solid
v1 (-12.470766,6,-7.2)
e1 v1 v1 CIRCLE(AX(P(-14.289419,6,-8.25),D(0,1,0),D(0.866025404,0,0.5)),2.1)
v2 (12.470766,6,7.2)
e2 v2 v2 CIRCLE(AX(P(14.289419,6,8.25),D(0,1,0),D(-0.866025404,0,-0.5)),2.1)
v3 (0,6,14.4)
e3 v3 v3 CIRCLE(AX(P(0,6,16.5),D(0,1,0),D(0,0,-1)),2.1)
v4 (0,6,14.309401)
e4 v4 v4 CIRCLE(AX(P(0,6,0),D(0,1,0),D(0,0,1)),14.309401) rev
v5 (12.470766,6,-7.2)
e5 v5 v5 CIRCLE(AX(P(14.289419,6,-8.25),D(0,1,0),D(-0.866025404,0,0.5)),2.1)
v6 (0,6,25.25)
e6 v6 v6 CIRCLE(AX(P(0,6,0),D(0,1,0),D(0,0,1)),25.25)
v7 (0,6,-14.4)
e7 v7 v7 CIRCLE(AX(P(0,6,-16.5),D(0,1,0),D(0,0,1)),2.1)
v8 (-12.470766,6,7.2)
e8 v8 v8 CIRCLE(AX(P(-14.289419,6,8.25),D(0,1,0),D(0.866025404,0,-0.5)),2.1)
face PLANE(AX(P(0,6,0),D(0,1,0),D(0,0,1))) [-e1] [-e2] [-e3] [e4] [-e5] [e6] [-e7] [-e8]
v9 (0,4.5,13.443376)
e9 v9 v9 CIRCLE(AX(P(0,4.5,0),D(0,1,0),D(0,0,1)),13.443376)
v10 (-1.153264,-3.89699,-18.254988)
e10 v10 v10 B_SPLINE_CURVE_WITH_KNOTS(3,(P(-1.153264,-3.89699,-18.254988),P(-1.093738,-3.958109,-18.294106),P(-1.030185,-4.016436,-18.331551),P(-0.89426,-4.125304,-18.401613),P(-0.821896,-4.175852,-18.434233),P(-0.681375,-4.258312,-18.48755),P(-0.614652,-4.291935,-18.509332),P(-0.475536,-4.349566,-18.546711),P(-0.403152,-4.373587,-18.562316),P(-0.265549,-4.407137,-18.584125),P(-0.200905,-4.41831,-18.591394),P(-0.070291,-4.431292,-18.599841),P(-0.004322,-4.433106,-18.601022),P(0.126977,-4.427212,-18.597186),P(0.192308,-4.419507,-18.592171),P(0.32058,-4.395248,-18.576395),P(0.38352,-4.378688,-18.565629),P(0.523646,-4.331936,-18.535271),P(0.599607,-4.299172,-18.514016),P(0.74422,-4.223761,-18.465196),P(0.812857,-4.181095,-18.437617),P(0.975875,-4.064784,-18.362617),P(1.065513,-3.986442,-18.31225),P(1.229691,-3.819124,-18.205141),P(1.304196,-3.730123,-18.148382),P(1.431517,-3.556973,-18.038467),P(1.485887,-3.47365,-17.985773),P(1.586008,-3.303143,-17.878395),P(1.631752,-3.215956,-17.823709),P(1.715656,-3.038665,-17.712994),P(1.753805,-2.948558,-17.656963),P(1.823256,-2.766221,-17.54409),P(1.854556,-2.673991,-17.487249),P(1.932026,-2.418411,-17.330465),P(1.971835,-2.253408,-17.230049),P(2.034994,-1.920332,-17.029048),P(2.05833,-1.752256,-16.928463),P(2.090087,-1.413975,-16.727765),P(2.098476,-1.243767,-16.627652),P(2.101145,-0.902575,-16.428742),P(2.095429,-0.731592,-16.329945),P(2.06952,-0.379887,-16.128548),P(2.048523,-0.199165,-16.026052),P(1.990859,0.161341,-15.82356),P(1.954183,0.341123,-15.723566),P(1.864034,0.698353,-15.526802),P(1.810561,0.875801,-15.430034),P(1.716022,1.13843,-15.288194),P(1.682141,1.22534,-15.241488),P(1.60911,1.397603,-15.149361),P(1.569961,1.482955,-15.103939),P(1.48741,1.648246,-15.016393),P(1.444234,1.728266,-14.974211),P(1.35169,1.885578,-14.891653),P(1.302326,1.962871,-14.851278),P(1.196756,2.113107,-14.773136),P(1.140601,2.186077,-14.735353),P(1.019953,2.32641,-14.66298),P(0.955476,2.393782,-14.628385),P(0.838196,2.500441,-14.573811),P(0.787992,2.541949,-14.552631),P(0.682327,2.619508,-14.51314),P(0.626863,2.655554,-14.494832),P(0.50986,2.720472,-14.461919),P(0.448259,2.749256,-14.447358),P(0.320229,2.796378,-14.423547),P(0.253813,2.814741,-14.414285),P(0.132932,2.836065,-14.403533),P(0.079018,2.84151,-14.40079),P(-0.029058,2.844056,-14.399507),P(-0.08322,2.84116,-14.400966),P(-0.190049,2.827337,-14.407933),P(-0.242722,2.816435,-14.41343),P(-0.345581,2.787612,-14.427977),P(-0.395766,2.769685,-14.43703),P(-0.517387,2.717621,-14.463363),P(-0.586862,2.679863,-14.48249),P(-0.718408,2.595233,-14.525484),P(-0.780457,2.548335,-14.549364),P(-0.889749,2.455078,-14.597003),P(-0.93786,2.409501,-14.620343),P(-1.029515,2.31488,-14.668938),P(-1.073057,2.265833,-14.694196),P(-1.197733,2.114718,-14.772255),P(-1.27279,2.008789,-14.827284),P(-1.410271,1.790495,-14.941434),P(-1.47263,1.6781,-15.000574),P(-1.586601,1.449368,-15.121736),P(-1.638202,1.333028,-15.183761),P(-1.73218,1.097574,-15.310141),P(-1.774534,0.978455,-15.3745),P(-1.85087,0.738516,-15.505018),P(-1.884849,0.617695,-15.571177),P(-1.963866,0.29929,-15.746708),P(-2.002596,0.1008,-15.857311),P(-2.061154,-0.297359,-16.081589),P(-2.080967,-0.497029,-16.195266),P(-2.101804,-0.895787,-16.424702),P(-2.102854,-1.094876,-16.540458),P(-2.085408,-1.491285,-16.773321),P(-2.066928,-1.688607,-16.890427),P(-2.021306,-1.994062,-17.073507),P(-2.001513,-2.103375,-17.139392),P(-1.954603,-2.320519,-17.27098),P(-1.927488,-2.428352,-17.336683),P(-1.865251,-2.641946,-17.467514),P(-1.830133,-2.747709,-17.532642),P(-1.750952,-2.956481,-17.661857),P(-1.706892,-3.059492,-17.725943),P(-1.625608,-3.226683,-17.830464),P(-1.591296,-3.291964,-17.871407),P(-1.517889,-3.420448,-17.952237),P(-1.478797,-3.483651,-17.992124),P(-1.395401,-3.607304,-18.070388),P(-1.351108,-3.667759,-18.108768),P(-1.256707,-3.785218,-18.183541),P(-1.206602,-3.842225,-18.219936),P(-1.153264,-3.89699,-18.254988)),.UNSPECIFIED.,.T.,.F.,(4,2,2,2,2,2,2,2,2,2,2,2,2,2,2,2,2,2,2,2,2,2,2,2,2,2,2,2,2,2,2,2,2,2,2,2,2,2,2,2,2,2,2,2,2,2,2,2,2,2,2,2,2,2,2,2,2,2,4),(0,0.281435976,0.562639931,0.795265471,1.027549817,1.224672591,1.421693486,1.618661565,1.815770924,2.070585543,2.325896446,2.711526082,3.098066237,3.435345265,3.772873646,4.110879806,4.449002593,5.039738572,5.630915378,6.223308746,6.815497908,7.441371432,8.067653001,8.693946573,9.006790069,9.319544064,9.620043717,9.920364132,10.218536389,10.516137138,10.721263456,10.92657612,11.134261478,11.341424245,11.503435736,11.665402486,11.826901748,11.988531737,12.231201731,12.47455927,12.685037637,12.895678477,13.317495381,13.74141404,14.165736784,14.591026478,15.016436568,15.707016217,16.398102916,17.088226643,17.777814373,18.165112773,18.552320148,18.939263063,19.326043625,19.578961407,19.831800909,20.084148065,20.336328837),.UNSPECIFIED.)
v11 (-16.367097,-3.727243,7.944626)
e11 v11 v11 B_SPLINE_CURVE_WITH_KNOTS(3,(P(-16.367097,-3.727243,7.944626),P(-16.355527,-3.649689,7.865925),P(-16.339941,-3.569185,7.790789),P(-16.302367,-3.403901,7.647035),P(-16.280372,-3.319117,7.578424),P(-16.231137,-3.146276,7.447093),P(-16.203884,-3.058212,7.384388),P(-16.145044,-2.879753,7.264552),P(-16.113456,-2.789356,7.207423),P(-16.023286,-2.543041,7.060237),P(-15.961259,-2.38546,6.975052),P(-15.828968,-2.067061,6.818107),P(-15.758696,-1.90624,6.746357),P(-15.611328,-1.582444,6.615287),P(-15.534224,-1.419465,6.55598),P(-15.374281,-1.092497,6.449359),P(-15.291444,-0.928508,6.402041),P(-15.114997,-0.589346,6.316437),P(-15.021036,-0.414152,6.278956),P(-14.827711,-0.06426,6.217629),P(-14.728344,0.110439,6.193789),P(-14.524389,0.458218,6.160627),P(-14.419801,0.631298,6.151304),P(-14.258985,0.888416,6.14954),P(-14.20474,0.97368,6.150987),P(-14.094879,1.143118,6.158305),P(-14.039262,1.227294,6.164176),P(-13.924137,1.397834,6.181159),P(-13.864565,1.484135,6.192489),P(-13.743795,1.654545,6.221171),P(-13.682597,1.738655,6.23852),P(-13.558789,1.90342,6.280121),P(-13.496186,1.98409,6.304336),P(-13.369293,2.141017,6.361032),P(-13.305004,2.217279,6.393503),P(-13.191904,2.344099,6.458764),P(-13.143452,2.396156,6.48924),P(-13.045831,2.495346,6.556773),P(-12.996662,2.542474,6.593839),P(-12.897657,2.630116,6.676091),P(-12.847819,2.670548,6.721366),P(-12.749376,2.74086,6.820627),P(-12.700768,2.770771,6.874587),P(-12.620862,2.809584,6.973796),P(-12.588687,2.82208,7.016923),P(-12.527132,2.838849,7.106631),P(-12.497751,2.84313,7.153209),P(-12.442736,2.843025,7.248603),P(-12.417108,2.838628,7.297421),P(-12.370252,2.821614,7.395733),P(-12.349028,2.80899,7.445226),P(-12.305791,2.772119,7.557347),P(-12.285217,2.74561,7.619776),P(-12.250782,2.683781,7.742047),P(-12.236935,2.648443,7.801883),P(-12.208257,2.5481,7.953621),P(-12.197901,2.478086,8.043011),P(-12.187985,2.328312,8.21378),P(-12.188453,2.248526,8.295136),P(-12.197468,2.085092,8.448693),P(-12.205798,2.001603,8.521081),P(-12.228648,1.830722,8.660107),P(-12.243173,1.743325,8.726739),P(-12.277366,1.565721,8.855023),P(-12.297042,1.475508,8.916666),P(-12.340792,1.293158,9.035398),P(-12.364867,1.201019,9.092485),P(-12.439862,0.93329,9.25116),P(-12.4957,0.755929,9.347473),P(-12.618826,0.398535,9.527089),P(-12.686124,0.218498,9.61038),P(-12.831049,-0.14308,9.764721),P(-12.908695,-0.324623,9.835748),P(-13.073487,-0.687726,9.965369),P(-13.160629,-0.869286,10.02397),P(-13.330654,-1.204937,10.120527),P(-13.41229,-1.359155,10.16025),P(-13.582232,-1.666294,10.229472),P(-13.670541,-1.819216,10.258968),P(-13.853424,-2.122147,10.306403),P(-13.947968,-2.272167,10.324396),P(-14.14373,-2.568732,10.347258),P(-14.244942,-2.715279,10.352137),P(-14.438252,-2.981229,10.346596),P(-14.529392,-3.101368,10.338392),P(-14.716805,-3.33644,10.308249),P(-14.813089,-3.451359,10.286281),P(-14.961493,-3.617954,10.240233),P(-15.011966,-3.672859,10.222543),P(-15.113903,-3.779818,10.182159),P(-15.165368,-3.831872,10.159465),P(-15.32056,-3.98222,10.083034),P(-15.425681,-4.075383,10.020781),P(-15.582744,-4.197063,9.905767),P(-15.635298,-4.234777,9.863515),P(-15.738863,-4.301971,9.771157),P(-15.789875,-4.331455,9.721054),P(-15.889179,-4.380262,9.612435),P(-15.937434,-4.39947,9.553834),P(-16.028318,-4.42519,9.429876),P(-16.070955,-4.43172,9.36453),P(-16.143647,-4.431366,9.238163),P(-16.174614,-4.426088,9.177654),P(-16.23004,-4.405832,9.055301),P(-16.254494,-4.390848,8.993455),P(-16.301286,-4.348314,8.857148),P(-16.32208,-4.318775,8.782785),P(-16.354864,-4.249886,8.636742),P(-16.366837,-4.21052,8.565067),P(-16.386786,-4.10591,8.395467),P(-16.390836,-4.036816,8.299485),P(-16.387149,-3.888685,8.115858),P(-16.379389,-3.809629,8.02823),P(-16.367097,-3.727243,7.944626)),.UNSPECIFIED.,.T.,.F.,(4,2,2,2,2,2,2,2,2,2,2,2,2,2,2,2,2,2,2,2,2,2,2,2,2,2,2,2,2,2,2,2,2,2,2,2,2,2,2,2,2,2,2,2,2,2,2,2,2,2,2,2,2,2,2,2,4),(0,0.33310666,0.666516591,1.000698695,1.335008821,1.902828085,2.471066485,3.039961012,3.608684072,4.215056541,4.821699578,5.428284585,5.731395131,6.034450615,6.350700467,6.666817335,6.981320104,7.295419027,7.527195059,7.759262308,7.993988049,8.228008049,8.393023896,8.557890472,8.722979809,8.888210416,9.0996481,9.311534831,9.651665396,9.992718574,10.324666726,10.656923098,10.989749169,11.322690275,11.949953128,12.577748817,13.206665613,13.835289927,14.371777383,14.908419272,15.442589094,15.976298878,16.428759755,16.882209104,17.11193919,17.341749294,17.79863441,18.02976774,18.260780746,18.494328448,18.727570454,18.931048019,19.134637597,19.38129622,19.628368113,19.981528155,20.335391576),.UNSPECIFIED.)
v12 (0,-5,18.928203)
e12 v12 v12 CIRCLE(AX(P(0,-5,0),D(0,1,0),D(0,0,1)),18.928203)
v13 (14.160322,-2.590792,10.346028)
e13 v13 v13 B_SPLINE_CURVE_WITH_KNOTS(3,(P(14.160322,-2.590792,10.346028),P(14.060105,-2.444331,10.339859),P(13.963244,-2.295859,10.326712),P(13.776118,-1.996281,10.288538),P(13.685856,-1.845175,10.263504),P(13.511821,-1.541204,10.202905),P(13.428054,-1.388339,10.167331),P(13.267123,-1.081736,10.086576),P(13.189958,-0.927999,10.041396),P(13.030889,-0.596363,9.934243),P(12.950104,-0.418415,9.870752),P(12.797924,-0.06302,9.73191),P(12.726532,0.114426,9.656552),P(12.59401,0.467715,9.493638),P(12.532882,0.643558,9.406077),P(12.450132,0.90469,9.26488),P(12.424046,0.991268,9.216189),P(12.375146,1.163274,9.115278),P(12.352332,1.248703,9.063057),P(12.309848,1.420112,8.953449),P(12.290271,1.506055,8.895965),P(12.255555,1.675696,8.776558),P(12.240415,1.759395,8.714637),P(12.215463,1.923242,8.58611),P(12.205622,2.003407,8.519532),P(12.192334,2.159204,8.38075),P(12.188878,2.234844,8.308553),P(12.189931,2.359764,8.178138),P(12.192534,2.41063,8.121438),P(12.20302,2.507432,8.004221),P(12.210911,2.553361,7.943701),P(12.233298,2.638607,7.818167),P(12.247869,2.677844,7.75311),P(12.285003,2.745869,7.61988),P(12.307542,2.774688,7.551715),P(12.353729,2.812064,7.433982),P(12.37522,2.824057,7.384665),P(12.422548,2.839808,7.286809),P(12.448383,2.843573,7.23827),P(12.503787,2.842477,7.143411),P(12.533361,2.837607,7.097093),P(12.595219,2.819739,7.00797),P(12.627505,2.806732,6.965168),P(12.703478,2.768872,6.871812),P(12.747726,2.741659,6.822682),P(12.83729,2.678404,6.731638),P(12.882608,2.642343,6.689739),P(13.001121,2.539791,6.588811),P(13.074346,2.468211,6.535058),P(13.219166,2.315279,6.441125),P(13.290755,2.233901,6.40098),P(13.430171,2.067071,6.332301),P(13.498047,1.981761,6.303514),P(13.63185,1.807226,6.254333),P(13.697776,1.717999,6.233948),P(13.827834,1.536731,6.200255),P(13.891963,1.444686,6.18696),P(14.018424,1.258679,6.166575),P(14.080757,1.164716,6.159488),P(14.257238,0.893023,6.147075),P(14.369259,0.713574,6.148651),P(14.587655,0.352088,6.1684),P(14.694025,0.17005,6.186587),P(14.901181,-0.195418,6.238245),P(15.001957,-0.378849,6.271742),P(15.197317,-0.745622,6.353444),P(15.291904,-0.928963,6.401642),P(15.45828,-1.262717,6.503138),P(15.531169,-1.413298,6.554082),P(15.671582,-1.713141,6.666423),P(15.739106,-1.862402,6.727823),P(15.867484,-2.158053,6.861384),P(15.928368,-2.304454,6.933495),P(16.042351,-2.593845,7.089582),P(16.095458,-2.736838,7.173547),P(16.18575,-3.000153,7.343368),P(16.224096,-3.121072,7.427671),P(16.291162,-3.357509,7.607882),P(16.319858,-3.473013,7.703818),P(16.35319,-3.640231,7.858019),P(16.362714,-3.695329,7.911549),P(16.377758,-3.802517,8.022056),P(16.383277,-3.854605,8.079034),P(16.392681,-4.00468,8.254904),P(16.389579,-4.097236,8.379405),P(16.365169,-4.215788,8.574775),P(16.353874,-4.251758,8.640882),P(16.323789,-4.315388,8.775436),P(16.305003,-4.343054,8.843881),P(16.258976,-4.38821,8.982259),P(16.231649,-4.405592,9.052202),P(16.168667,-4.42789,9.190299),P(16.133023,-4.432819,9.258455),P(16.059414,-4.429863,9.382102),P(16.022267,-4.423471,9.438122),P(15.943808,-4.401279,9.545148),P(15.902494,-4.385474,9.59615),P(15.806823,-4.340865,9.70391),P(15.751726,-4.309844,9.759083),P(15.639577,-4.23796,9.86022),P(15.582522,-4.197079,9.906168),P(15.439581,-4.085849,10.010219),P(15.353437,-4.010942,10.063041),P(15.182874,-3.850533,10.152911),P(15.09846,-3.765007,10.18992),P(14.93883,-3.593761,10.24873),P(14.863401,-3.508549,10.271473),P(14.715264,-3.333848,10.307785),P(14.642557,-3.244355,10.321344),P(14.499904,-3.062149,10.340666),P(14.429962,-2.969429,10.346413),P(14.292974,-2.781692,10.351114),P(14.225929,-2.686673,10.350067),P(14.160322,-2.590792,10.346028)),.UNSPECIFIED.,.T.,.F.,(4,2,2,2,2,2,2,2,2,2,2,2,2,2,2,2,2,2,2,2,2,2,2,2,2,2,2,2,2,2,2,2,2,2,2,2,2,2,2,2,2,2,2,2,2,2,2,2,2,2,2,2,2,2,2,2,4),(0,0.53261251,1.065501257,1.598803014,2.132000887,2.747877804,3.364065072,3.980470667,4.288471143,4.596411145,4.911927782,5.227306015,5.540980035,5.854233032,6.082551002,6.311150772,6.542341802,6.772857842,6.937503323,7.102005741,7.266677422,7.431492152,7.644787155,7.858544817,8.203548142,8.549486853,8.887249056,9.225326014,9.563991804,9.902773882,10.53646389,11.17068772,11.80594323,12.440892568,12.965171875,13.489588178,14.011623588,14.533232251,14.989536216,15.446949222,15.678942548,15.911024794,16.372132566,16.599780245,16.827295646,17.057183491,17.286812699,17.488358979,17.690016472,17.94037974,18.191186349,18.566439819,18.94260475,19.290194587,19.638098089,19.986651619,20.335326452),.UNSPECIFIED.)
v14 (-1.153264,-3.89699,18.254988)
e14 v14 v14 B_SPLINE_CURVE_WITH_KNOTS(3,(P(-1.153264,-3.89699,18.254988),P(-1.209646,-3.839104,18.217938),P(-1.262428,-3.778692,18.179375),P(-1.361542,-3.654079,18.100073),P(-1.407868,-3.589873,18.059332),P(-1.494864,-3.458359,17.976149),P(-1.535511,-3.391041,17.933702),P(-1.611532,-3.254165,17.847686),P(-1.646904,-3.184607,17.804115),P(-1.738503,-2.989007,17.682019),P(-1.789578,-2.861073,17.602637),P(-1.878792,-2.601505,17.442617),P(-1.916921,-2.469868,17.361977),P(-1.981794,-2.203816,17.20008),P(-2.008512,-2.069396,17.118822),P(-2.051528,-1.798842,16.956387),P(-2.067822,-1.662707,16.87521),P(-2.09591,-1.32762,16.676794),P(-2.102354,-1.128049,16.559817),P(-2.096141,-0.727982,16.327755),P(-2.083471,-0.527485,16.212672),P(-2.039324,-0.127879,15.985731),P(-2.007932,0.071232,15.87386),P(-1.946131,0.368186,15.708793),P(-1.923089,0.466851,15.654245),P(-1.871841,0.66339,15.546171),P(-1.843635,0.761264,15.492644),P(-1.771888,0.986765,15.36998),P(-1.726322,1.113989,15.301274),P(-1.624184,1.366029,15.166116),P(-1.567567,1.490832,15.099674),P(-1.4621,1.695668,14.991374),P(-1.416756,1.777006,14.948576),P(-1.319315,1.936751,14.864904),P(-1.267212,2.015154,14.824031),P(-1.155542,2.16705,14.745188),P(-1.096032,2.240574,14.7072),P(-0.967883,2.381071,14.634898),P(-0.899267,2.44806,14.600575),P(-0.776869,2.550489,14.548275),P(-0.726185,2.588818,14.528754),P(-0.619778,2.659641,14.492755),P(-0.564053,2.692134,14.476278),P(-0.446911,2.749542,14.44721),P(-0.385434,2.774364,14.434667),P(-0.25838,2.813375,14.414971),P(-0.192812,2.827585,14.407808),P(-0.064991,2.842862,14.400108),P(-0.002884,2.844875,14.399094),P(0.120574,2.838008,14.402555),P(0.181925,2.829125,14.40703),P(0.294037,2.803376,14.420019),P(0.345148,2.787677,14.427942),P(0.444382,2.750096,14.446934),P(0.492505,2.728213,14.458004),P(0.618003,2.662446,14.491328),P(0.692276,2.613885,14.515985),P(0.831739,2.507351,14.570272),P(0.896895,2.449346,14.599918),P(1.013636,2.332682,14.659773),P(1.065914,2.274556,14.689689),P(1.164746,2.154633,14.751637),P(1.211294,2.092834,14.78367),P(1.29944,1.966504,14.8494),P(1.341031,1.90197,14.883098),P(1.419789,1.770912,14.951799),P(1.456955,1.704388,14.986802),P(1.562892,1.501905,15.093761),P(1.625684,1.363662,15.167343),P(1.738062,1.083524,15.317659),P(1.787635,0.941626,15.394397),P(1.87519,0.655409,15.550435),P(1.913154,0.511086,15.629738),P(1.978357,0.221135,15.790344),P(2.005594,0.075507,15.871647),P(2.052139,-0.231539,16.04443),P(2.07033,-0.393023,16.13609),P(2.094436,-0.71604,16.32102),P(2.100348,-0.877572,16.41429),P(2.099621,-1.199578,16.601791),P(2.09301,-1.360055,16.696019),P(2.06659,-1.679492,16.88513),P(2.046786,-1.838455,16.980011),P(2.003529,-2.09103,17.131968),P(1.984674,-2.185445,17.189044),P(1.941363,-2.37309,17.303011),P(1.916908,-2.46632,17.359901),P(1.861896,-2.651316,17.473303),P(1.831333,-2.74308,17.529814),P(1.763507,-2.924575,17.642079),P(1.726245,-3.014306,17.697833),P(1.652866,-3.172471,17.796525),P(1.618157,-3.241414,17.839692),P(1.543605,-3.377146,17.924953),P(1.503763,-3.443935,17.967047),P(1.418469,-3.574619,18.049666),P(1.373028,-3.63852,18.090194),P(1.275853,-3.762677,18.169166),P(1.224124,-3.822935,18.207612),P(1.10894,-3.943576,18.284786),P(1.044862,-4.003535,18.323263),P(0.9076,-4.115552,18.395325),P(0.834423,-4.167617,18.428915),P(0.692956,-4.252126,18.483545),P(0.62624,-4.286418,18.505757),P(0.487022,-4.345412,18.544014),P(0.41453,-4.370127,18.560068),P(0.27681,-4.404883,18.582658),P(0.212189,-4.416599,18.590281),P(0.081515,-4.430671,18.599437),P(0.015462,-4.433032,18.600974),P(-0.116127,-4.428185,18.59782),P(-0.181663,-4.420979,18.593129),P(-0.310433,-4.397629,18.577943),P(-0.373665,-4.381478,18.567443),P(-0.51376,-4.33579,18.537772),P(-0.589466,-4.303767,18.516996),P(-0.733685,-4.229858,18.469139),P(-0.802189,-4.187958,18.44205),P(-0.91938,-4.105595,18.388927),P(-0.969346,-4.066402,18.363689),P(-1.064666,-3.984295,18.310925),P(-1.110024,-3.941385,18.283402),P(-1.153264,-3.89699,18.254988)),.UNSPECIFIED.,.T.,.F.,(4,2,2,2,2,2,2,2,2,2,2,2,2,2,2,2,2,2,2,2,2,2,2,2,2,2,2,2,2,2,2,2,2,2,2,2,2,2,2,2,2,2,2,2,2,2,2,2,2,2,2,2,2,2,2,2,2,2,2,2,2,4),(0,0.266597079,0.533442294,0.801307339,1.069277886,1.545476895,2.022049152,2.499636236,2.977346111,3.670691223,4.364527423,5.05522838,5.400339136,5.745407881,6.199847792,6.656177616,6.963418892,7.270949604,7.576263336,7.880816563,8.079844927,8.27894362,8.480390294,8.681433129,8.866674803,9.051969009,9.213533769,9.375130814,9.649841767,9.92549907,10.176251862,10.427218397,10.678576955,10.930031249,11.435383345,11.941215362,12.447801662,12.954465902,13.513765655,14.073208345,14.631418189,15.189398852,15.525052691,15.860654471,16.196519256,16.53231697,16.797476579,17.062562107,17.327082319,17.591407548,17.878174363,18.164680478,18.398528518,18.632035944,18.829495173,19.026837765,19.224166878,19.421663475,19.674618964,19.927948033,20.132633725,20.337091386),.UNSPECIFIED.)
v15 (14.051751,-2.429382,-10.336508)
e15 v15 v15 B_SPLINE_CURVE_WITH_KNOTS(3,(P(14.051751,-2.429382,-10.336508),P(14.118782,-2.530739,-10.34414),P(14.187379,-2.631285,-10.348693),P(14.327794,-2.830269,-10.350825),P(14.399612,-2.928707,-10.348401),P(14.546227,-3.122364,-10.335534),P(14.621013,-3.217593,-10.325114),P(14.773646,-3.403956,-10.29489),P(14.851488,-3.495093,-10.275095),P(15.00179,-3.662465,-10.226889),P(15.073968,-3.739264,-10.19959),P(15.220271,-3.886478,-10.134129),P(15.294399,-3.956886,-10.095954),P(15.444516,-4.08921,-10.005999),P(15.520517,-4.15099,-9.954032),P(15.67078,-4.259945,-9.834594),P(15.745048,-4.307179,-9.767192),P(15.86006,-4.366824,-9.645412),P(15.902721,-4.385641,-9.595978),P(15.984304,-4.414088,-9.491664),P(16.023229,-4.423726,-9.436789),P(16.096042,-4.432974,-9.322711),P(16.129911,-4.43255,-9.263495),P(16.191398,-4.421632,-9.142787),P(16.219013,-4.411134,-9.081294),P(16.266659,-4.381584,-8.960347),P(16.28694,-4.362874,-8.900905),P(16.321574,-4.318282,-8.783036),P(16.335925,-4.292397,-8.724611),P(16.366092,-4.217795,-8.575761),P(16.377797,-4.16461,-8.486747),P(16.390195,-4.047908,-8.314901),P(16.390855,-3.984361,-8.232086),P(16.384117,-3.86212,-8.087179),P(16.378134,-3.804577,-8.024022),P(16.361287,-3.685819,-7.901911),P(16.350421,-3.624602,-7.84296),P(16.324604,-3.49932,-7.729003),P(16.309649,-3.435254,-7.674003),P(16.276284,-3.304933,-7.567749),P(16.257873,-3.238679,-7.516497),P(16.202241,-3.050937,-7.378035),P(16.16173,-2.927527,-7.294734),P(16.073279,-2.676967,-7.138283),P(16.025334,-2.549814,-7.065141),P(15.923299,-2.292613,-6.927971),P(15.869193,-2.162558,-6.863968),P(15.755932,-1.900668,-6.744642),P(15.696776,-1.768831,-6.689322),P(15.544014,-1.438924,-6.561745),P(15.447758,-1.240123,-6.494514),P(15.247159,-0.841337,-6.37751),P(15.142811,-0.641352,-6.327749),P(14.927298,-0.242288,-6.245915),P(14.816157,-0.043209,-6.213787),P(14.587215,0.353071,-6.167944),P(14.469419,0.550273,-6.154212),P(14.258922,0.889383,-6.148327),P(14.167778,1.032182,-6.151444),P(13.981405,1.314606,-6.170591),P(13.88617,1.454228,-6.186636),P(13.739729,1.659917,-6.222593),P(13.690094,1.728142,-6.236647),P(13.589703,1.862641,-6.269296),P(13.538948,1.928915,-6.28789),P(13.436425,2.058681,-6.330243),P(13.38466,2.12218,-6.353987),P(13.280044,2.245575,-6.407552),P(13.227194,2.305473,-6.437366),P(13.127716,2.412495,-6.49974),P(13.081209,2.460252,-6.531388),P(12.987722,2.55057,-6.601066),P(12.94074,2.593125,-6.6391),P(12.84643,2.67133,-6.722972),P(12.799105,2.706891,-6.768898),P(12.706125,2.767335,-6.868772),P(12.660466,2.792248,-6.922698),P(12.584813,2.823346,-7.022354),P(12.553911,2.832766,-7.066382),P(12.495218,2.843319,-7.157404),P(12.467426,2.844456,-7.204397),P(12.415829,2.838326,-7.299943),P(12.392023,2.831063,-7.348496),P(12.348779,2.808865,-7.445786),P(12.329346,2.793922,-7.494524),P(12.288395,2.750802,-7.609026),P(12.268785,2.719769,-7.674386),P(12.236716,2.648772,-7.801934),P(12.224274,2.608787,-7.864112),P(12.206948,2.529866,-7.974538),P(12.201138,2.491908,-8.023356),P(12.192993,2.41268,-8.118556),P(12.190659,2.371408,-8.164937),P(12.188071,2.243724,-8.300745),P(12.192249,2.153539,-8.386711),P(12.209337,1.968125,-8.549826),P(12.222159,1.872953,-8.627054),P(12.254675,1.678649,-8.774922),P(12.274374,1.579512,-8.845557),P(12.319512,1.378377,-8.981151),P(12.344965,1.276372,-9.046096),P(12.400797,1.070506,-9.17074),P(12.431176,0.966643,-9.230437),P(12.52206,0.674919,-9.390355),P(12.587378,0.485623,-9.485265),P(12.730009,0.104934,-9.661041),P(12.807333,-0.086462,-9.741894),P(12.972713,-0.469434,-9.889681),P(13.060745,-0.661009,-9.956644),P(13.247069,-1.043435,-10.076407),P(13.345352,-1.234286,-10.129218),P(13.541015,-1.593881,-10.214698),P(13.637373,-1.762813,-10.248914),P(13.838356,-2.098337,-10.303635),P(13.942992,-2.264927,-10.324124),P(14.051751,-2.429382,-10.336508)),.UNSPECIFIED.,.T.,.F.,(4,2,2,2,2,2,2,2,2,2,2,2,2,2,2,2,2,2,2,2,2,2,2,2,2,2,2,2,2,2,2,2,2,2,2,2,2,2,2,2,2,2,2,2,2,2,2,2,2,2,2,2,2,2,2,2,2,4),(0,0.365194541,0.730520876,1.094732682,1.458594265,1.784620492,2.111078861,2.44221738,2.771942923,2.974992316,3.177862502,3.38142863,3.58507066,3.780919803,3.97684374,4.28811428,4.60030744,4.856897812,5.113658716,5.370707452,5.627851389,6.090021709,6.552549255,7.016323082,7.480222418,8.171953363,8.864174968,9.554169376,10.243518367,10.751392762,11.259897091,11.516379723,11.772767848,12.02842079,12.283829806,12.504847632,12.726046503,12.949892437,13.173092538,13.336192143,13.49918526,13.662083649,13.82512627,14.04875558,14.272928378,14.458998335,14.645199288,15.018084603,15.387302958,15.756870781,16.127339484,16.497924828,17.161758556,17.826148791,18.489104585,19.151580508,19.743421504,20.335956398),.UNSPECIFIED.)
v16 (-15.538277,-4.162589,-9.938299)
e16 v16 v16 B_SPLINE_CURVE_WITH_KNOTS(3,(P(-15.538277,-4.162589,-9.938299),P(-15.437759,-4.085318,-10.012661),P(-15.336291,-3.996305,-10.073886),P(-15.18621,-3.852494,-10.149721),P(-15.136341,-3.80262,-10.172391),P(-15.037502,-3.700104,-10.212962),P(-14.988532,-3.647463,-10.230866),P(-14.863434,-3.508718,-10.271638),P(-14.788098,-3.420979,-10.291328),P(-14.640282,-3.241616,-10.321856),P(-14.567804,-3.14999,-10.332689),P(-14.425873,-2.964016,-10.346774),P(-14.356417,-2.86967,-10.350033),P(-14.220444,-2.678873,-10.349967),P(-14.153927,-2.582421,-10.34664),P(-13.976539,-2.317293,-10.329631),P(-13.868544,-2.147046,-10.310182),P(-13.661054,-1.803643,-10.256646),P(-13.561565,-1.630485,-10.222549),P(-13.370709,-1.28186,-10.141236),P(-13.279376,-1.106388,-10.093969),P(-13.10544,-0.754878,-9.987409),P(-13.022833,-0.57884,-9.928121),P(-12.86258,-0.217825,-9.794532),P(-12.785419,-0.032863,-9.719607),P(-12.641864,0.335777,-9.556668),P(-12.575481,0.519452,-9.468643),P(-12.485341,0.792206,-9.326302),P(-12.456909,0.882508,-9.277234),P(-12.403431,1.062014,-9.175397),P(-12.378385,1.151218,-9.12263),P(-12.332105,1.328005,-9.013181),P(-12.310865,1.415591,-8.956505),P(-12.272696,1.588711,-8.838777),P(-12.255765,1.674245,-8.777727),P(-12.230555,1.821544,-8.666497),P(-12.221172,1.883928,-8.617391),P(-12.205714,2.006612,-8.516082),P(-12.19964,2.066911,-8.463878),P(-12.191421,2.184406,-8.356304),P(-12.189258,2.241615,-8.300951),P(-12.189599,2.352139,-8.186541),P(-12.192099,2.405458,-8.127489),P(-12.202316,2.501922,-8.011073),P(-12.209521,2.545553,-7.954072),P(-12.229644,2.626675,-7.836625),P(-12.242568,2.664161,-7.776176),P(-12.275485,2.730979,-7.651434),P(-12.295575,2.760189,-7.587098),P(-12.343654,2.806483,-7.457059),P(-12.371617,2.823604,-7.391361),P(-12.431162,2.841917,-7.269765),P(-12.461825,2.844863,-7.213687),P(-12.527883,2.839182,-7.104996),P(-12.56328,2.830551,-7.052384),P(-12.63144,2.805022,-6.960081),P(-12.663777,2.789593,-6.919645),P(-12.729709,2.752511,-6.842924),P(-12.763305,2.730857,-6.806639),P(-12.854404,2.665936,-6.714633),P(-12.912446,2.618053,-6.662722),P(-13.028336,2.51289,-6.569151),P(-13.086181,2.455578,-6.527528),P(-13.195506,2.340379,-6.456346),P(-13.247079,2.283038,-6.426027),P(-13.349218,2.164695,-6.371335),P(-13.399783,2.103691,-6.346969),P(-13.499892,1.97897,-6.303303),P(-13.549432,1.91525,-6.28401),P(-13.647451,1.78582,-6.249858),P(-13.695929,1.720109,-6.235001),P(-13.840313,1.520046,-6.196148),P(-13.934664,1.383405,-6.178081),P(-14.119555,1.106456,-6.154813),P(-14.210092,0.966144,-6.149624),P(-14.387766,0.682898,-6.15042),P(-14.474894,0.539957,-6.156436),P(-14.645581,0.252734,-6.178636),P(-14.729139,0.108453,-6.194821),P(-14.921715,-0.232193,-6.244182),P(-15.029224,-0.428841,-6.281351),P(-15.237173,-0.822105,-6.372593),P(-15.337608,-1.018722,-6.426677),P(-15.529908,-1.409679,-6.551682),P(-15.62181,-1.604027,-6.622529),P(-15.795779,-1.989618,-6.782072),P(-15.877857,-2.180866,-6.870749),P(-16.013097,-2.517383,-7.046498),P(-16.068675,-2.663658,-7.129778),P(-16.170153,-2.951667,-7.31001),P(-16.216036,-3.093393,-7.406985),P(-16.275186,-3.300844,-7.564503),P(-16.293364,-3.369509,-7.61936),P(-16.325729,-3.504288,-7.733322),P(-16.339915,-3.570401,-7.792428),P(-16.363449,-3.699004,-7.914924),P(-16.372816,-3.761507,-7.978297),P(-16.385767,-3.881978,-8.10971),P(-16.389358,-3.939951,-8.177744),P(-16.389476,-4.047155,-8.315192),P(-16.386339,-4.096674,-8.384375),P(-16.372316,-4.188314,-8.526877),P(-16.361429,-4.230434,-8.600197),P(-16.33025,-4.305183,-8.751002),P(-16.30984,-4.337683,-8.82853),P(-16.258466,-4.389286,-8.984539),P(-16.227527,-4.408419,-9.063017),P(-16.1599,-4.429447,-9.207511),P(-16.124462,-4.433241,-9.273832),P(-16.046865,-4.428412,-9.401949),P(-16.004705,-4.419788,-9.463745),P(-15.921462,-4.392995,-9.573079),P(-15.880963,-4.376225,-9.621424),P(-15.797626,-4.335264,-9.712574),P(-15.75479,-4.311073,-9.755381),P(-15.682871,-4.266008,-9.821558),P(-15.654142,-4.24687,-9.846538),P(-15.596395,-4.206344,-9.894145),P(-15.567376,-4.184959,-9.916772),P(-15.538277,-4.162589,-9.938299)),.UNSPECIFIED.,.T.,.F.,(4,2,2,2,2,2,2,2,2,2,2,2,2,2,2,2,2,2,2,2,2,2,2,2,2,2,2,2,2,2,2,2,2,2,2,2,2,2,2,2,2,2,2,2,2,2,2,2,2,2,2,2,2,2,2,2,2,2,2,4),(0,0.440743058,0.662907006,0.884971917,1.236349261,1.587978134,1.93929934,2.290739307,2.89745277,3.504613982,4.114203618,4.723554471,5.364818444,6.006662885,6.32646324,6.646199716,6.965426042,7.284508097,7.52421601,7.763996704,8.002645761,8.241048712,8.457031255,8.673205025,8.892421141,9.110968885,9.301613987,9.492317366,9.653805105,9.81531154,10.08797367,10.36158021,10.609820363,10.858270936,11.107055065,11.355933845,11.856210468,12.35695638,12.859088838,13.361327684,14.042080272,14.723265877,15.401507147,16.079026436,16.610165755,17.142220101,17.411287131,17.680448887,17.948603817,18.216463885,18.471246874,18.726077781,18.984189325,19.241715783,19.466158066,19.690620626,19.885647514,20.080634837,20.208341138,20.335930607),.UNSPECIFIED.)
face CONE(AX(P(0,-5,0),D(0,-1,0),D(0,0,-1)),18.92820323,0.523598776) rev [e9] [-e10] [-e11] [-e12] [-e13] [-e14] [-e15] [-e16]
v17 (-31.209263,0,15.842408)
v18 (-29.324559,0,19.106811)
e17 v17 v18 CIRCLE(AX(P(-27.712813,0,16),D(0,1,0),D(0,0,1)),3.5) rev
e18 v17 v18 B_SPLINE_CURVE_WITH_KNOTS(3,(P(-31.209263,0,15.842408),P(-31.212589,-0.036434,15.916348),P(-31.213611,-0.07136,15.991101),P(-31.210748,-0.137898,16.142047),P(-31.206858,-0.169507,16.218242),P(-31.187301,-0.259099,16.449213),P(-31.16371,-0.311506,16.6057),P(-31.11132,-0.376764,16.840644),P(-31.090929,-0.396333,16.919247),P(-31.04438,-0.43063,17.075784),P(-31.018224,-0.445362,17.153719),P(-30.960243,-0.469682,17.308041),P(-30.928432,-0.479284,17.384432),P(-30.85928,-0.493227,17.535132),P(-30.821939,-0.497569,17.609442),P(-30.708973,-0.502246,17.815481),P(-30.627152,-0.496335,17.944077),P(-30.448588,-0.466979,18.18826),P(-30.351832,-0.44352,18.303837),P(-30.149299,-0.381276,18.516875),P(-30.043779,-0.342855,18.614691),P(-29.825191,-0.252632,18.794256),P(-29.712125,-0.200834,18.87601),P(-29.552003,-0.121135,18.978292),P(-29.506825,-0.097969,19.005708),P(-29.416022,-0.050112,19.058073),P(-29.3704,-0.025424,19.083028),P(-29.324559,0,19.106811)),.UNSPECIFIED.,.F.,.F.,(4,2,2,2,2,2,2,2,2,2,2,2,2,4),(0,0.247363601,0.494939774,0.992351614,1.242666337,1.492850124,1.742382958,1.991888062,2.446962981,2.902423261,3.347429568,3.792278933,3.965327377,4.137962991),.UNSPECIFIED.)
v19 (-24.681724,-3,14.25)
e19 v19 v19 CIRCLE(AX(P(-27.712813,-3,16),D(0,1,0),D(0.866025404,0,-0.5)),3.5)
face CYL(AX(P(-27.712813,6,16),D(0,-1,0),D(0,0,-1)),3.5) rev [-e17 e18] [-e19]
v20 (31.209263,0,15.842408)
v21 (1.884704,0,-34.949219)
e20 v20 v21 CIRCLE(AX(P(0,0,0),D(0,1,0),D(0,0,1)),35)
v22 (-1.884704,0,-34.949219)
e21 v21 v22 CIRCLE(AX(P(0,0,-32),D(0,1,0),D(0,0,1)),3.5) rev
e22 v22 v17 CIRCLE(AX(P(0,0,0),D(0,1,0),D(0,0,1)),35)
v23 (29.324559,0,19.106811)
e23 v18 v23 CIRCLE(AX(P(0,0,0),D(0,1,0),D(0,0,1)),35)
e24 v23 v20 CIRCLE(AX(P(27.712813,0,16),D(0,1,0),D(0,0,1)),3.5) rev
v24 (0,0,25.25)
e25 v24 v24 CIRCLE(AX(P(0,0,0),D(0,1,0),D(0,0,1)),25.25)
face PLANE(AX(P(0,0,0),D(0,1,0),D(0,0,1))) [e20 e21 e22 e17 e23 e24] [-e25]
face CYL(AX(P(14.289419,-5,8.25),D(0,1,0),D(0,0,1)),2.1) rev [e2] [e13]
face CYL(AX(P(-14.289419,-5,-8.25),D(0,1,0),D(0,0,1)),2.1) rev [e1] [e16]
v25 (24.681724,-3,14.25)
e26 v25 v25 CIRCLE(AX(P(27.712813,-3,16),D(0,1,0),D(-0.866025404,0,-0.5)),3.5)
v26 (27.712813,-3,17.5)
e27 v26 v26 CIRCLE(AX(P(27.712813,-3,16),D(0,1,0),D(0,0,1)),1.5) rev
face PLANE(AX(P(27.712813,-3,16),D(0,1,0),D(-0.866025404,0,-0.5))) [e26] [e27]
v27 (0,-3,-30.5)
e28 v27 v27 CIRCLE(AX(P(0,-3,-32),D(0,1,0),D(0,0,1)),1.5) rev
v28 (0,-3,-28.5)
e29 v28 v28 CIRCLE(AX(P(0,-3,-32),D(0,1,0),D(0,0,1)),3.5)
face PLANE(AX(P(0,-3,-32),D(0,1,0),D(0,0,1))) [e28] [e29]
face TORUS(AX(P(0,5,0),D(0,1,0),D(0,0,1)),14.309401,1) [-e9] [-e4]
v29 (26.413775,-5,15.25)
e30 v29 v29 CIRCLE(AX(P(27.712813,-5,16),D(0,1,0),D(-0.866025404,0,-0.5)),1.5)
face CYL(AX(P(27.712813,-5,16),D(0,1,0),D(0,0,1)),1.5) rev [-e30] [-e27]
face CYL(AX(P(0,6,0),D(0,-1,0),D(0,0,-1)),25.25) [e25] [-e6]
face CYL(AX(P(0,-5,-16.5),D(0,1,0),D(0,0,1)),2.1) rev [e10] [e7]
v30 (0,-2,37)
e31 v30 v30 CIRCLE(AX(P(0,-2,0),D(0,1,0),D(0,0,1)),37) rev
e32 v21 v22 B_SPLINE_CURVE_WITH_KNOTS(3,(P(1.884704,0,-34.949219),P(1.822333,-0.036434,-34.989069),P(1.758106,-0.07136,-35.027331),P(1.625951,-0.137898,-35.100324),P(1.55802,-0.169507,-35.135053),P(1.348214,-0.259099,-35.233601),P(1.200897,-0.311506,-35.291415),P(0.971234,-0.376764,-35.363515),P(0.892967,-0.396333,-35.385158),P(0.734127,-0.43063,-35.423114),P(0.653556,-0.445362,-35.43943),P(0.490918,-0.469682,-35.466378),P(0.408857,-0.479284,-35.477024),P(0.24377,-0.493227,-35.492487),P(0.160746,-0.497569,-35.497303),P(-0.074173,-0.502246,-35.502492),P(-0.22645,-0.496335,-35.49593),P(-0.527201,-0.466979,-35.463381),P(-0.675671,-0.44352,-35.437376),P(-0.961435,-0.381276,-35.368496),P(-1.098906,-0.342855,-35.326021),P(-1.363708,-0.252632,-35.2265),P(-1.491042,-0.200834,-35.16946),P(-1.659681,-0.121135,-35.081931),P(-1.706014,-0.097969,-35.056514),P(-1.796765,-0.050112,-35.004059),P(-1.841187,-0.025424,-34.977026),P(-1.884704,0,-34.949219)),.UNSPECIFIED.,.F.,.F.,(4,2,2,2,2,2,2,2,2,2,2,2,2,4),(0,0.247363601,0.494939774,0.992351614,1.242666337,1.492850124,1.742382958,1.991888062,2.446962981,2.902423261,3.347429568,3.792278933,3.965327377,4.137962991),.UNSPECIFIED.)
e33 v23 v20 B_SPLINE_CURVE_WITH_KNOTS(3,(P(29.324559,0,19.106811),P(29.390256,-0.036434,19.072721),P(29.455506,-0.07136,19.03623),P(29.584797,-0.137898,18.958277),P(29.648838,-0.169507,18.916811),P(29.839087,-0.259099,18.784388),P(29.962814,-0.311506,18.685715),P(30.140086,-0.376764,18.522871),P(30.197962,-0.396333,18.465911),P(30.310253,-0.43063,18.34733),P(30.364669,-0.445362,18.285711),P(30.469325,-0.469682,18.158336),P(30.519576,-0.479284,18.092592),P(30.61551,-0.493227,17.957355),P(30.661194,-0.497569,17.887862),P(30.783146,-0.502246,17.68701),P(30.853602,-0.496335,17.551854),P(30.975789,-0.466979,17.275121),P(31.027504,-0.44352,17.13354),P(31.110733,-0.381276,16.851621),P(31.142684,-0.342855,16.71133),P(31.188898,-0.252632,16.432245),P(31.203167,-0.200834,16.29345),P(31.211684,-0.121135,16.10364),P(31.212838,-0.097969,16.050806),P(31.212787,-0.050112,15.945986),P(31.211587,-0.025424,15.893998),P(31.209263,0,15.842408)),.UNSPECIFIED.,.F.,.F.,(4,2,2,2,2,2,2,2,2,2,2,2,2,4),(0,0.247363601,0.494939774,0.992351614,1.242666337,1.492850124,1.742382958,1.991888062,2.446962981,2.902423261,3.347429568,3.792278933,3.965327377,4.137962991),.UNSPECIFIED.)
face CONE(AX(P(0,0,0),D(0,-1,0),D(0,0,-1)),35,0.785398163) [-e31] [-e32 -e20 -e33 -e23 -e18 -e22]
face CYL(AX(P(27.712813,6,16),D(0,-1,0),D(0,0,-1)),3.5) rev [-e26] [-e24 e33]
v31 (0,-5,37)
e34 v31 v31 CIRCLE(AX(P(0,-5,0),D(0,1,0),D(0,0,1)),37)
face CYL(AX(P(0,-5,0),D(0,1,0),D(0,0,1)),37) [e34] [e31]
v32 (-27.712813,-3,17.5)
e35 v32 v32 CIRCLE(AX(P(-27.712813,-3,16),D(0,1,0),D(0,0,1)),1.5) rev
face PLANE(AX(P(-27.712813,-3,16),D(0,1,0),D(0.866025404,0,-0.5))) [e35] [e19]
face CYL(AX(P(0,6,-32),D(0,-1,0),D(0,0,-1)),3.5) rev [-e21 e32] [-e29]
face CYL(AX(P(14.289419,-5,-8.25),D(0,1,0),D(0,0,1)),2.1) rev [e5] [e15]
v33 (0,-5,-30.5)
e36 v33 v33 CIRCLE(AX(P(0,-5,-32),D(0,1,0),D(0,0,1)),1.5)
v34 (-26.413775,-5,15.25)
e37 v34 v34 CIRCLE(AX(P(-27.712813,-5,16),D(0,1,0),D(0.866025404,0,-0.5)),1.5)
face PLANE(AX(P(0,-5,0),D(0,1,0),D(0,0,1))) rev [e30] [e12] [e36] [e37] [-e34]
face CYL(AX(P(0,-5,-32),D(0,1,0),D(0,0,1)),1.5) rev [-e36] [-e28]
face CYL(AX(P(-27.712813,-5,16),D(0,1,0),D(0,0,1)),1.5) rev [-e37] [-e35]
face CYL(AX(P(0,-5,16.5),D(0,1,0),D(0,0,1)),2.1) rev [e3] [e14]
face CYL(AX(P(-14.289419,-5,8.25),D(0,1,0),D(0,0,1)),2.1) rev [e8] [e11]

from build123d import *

# Parameters (mm, degrees)
SKETCH1_R           = 25.25
SKETCH1_R_2         = 12
BOSS_EXTRUDE1_DEPTH = 6
BOSS_EXTRUDE2_START = -5
SKETCH2_R           = 37
SKETCH2_R_2         = 12
BOSS_EXTRUDE2_DEPTH = 5
SKETCH3_R           = 1.5
CUT_EXTRUDE1_DEPTH  = 53.668776329
CUT_EXTRUDE2_START  = -3
SKETCH4_R           = 3.5
CUT_EXTRUDE2_DEPTH  = 56.668776329
CIRPATTERN1_COUNT   = 3
CHAMFER1_SIZE       = 12
CHAMFER1_SIZE_2     = 6.92820323
CHAMFER2_SIZE       = 2
SKETCH5_R           = 2.1
CUT_EXTRUDE3_DEPTH  = 54.46961768
CIRPATTERN2_COUNT   = 6
FILLET1_R           = 1


with BuildPart() as part:
    # Sketch1 → Boss-Extrude1 (new body)
    with BuildSketch(Plane(origin=(0, 0, 0), x_dir=(1, 0, 0), z_dir=(0, 1, 0))):
        with Locations(Location((0, 0, 0), (0, 0, 270))):
            Circle(SKETCH1_R)
        with Locations(Location((0, 0, 0), (0, 0, 270))):
            Circle(SKETCH1_R_2, mode=Mode.SUBTRACT)
    extrude(amount=BOSS_EXTRUDE1_DEPTH)

    # Sketch2 → Boss-Extrude2 (add)
    with BuildSketch(Plane(origin=(0, 0, 0), x_dir=(1, 0, 0), z_dir=(0, 1, 0)).offset(BOSS_EXTRUDE2_START)):
        with Locations(Location((0, 0, 0), (0, 0, 270))):
            Circle(SKETCH2_R)
        with Locations(Location((0, 0, 0), (0, 0, 270))):
            Circle(SKETCH2_R_2, mode=Mode.SUBTRACT)
    extrude(amount=BOSS_EXTRUDE2_DEPTH)

    # Sketch3 → Cut-Extrude1 (cut, through all)
    with BuildSketch(Plane(origin=(0, 0, 0), x_dir=(1, 0, 0), z_dir=(0, 1, 0))):
        with Locations(Location((0, 32, 0), (0, 0, 270))):
            Circle(SKETCH3_R)
    cut_extrude1 = extrude(amount=-CUT_EXTRUDE1_DEPTH, mode=Mode.SUBTRACT)

    # Sketch4 → Cut-Extrude2 (cut)
    with BuildSketch(Plane(origin=(0, 0, 0), x_dir=(1, 0, 0), z_dir=(0, 1, 0)).offset(CUT_EXTRUDE2_START)):
        with Locations(Location((0, 32, 0), (0, 0, 270))):
            Circle(SKETCH4_R)
    cut_extrude2 = extrude(amount=CUT_EXTRUDE2_DEPTH, mode=Mode.SUBTRACT)

    # CirPattern1: Cut-Extrude1, Cut-Extrude2 ×3 about axis
    cirpattern1_axis = Axis((0, 0, 0), (0, 1, 0))
    add([cut_extrude1.rotate(cirpattern1_axis, i * 360 / CIRPATTERN1_COUNT) for i in range(1, CIRPATTERN1_COUNT)], mode=Mode.SUBTRACT)
    add([cut_extrude2.rotate(cirpattern1_axis, i * 360 / CIRPATTERN1_COUNT) for i in range(1, CIRPATTERN1_COUNT)], mode=Mode.SUBTRACT)

    # Chamfer1
    # the kernel refuses this chamfer: 12, 6.92820323 mm, written as the material it takes off along each edge
    with BuildSketch(Plane(origin=(0, -5, 0), x_dir=(0, 0, 1), z_dir=(-1, 0, 0))) as chamfer1_piece_1:
        Polygon((12, CHAMFER1_SIZE), (12 + CHAMFER1_SIZE_2, 0), (12, 0), align=None)
    revolve(axis=Axis((0, -5, 0), (0, 1, 0)), mode=Mode.SUBTRACT)

    # Chamfer2
    # the kernel refuses this chamfer: 2 mm, written as the material it takes off along each edge
    with BuildSketch(Plane(origin=(0, 0, 0), x_dir=(0, 0, 1), z_dir=(-1, 0, 0))) as chamfer2_piece_1:
        Polygon((37 - CHAMFER2_SIZE, 0), (37, -CHAMFER2_SIZE), (37, 0), align=None)
    revolve(axis=Axis((0, 0, 0), (0, 1, 0)), mode=Mode.SUBTRACT)

    # Sketch5 → Cut-Extrude3 (cut, through all)
    with BuildSketch(Plane(origin=(0, 6, 0), x_dir=(1, 0, 0), z_dir=(0, 1, 0))):
        with Locations(Location((0, 16.5, 0), (0, 0, 270))):
            Circle(SKETCH5_R)
    cut_extrude3 = extrude(amount=-CUT_EXTRUDE3_DEPTH, mode=Mode.SUBTRACT)

    # CirPattern2: Cut-Extrude3 ×6 about axis
    cirpattern2_axis = Axis((0, 0, 0), (0, 1, 0))
    for i in range(1, CIRPATTERN2_COUNT):
        add(cut_extrude3.rotate(cirpattern2_axis, i * 360 / CIRPATTERN2_COUNT), mode=Mode.SUBTRACT)

    # Fillet1
    fillet1_edges = [part.edges().sort_by_distance(p)[0] for p in [
        (0, 6, -12.577350269),
    ]]
    fillet(fillet1_edges, radius=FILLET1_R)


solid = part.part
